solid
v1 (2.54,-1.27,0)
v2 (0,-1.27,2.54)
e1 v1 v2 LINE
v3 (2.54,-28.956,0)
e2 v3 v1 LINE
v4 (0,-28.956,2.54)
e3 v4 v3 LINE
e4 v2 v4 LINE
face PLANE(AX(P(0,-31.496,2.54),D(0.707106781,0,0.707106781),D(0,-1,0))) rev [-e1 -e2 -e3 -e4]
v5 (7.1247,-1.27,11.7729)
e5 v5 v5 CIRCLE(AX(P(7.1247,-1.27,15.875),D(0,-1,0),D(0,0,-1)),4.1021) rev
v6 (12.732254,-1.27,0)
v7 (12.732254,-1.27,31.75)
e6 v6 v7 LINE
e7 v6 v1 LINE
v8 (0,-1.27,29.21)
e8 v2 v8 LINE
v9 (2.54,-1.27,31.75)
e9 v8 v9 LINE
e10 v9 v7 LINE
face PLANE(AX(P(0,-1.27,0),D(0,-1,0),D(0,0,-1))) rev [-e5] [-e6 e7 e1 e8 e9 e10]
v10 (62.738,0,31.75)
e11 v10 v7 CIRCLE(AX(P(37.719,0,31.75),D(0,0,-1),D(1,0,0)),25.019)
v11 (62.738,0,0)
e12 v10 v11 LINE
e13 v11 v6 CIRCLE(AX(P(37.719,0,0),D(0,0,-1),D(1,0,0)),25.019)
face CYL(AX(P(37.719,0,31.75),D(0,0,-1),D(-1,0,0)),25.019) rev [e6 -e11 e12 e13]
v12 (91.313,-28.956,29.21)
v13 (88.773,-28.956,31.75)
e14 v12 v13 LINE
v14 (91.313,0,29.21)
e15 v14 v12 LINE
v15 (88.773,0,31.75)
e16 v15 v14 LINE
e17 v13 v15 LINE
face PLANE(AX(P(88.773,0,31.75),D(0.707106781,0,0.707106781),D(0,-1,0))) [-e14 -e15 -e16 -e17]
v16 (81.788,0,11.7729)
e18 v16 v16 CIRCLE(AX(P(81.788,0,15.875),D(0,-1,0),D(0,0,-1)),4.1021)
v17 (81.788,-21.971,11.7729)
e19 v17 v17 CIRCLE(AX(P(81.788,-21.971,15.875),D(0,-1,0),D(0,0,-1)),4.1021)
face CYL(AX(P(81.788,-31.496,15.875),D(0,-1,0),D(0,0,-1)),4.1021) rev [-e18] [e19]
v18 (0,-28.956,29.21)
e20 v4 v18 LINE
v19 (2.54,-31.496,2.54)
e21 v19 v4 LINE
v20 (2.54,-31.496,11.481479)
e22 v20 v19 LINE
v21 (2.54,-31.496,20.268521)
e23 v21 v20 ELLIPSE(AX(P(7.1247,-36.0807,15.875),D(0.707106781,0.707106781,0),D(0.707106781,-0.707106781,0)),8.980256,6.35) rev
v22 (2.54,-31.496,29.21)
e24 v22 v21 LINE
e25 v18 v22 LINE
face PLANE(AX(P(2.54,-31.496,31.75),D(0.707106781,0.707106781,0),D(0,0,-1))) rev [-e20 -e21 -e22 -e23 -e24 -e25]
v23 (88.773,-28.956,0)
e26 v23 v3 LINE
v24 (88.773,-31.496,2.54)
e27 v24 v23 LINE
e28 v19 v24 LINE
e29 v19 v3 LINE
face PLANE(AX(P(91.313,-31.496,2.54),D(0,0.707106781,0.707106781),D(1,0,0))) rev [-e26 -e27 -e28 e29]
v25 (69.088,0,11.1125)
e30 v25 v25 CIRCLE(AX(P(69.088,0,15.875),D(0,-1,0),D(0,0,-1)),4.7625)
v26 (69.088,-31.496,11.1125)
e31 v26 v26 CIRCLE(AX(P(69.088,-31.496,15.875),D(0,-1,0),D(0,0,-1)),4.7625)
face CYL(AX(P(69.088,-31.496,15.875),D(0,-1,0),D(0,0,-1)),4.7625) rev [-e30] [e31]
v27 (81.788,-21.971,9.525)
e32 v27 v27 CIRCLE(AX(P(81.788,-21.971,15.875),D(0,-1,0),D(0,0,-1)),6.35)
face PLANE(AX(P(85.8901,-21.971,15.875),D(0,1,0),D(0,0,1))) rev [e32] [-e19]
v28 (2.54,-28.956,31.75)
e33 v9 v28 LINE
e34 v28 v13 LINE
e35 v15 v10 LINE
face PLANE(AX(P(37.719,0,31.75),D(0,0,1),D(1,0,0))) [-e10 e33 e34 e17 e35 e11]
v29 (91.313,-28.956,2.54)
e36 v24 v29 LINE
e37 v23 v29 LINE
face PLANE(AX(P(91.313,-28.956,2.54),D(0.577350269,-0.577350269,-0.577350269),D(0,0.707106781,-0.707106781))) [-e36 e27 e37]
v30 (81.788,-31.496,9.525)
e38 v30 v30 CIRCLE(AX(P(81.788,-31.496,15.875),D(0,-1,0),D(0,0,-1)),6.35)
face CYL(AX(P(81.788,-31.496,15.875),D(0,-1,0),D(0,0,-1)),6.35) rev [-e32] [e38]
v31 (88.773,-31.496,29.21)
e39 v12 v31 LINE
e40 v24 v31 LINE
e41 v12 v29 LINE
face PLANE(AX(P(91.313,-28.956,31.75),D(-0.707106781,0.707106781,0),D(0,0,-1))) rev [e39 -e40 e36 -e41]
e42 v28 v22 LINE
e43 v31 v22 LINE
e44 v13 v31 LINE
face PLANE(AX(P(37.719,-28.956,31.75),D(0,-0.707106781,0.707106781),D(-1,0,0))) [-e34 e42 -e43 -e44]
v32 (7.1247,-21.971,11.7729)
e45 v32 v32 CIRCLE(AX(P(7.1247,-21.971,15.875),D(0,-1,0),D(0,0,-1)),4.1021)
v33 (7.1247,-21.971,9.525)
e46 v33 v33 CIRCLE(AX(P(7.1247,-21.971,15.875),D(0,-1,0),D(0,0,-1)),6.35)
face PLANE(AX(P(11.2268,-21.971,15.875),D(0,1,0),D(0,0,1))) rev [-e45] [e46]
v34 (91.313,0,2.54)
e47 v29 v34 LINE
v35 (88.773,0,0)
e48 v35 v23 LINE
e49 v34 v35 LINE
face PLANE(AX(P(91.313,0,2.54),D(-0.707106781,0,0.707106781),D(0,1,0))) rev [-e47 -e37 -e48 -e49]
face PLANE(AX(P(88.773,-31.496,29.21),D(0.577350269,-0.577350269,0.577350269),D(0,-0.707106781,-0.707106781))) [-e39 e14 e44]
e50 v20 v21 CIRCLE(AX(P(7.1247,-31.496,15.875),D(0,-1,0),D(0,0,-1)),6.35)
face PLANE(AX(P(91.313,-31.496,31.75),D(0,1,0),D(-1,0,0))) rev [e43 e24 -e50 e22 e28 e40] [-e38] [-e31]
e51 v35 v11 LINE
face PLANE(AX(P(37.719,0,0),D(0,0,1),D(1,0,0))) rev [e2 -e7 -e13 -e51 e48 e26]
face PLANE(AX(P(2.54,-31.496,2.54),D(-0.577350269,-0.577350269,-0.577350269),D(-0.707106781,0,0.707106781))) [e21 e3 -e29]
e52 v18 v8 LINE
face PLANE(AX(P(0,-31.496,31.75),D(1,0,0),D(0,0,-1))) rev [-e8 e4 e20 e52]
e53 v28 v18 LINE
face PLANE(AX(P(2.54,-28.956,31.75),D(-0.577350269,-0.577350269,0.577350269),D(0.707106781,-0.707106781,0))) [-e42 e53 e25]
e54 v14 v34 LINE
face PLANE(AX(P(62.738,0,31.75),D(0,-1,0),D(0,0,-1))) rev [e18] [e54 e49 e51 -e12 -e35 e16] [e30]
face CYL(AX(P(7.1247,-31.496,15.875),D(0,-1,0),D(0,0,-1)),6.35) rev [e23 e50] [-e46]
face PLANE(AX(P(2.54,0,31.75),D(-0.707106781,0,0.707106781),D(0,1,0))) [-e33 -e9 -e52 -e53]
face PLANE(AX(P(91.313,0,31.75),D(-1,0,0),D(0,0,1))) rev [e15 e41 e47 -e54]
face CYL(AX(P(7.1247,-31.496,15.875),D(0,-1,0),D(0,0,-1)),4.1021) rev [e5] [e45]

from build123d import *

# Parameters (mm, degrees)
BOSS_EXTRUDE1_DEPTH                               = 31.75
CBORE_FOR_5_16_SOCKET_HEAD_CAP_SCREW1_D           = 8.2042
CBORE_FOR_5_16_SOCKET_HEAD_CAP_SCREW1_CBORE_D     = 12.7
CBORE_FOR_5_16_SOCKET_HEAD_CAP_SCREW1_CBORE_DEPTH = 9.525
F_3_8_0_375_CLEARANCE_DOWEL_HOLE2_D               = 9.525
SKETCH9_W                                         = 23.721553131
SKETCH9_H                                         = 31.75
CUT_EXTRUDE1_DEPTH                                = 1.27


with BuildPart() as part:
    # Sketch1 → Boss-Extrude1 (new body)
    with BuildSketch(Plane.XY):
        with BuildLine():
            Line((0, 0), (12.7, 0))
            ThreePointArc((12.7, 0), (37.719, -25.019), (62.738, 0))
            Line((62.738, 0), (91.313, 0))
            Line((91.313, 0), (91.313, -31.496))
            Line((91.313, -31.496), (0, -31.496))
            Line((0, -31.496), (0, 0))
        make_face()
    extrude(amount=BOSS_EXTRUDE1_DEPTH)

    # CBORE for 5/16 Socket Head Cap Screw1 (through all)
    with Locations(Plane(origin=(0, -31.496, 0), x_dir=(-1, 0, 0), z_dir=(0, -1, 0))):
        with Locations((-7.1247, -15.875), (-81.788, -15.875)):
            CounterBoreHole(CBORE_FOR_5_16_SOCKET_HEAD_CAP_SCREW1_D / 2, CBORE_FOR_5_16_SOCKET_HEAD_CAP_SCREW1_CBORE_D / 2, CBORE_FOR_5_16_SOCKET_HEAD_CAP_SCREW1_CBORE_DEPTH)

    # 3/8 (0.375) Clearance Dowel Hole2 (through all)
    with Locations(Plane(origin=(0, -31.496, 0), x_dir=(-1, 0, 0), z_dir=(0, -1, 0))):
        with Locations((-69.088, -15.875)):
            Hole(F_3_8_0_375_CLEARANCE_DOWEL_HOLE2_D / 2)

    # Sketch9 → Cut-Extrude1 (cut)
    with BuildSketch(Plane(origin=(0, 0, 0), x_dir=(1, 0, 0), z_dir=(0, 1, 0))):
        with Locations((11.860776566, -15.875)):
            Rectangle(SKETCH9_W, SKETCH9_H)
    extrude(amount=-CUT_EXTRUDE1_DEPTH, mode=Mode.SUBTRACT)

    # Chamfer1
    # the kernel refuses this chamfer: 2.54 mm, written as the material it takes off along each edge
    with BuildSketch(Plane(origin=(89.619666667, -29.802666667, 30.056666667), x_dir=(0, -0.7071067811865476, -0.7071067811865476), z_dir=(0.5773502691896247, -0.5773502691896263, 0.5773502691896263)), Plane(origin=(1.693333333, -29.802666667, 1.693333333), x_dir=(0.7071067811865474, 0, -0.7071067811865477), z_dir=(-0.5773502691896264, -0.5773502691896247, -0.5773502691896262))) as chamfer1_piece_1:
        Polygon((-1.796051224, -1.036950658), (1.796051224, -1.036950658), (0, 2.073901316), align=None)
    extrude(amount=3.226233304, mode=Mode.SUBTRACT)
    with BuildSketch(Plane(origin=(89.619666667, -29.802666667, 1.693333333), x_dir=(0, -0.7071067811865474, 0.7071067811865477), z_dir=(0.5773502691896246, -0.5773502691896264, -0.5773502691896262)), Plane(origin=(1.693333333, -29.802666667, 30.056666667), x_dir=(0.7071067811865476, 0, 0.7071067811865476), z_dir=(-0.5773502691896263, -0.5773502691896247, 0.5773502691896263))) as chamfer1_piece_2:
        Polygon((-1.796051224, 1.036950658), (1.796051224, 1.036950658), (0, -2.073901316), align=None)
    extrude(amount=3.226233304, mode=Mode.SUBTRACT)
    with BuildSketch(Plane(origin=(91.313, 6.532074789, 31.75), x_dir=(-0.9996219169112968, 0, 0.02749587661058591), z_dir=(0, -1, 0))) as chamfer1_piece_3:
        with BuildLine():
            Line((2.612829916, 0), (-0.143629773, 2.608879196))
            Line((-0.143629773, 2.608879196), (-0.194410567, 2.607482405))
            ThreePointArc((-0.194410567, 2.607482405), (-0.086688237, 1.304030487), (-0.050780793, -0.001396791))
            Line((-0.050780793, -0.001396791), (0.001396791, -0.050780793))
            ThreePointArc((0.001396791, -0.050780793), (1.306824068, -0.01487335), (2.614226706, -0.050780793))
            Line((2.614226706, -0.050780793), (2.612829916, 0))
        make_face()
    extrude(amount=44.560149579, mode=Mode.SUBTRACT)
    with BuildSketch(Plane(origin=(91.313, -31.496, -6.532074789), x_dir=(-0.9996219169112968, -0.02749587661058591, 0), z_dir=(0, 0, 1)), Plane(origin=(0, -31.496, -6.532074789), x_dir=(-0.027495876610586358, 0.9996219169112968, 0), z_dir=(0, 0, 1))) as chamfer1_piece_4:
        with BuildLine():
            Line((2.612829916, 0), (-0.143629773, -2.608879196))
            Line((-0.143629773, -2.608879196), (-0.194410567, -2.607482405))
            ThreePointArc((-0.194410567, -2.607482405), (-0.086688237, -1.304030487), (-0.050780793, 0.001396791))
            Line((-0.050780793, 0.001396791), (0.001396791, 0.050780793))
            ThreePointArc((0.001396791, 0.050780793), (1.306824068, 0.01487335), (2.614226706, 0.050780793))
            Line((2.614226706, 0.050780793), (2.612829916, 0))
        make_face()
    extrude(amount=44.814149579, mode=Mode.SUBTRACT)
    with BuildSketch(Plane(origin=(0, -38.028074789, 0), x_dir=(-0.027495876610586365, 0, 0.9996219169112968), z_dir=(0, 1, 0))) as chamfer1_piece_5:
        with BuildLine():
            Line((2.612829916, 0), (-0.143629773, 2.608879196))
            Line((-0.143629773, 2.608879196), (-0.194410567, 2.607482405))
            ThreePointArc((-0.194410567, 2.607482405), (-0.086688237, 1.304030487), (-0.050780793, -0.001396791))
            Line((-0.050780793, -0.001396791), (0.001396791, -0.050780793))
            ThreePointArc((0.001396791, -0.050780793), (1.306824068, -0.01487335), (2.614226706, -0.050780793))
            Line((2.614226706, -0.050780793), (2.612829916, 0))
        make_face()
    extrude(amount=43.290149579, mode=Mode.SUBTRACT)
    with BuildSketch(Plane(origin=(0, -38.028074789, 31.75), x_dir=(-0.0274958766105864, 0, -0.9996219169112968), z_dir=(0, 1, 0))) as chamfer1_piece_6:
        with BuildLine():
            Line((2.612829916, 0), (-0.143629773, -2.608879196))
            Line((-0.143629773, -2.608879196), (-0.194410567, -2.607482405))
            ThreePointArc((-0.194410567, -2.607482405), (-0.086688237, -1.304030487), (-0.050780793, 0.001396791))
            Line((-0.050780793, 0.001396791), (0.001396791, 0.050780793))
            ThreePointArc((0.001396791, 0.050780793), (1.306824068, 0.01487335), (2.614226706, 0.050780793))
            Line((2.614226706, 0.050780793), (2.612829916, 0))
        make_face()
    extrude(amount=43.290149579, mode=Mode.SUBTRACT)
    with BuildSketch(Plane(origin=(97.845074789, -31.496, 31.75), x_dir=(0, 0.9996219169112966, 0.027495876610585942), z_dir=(-1, 0, 0))) as chamfer1_piece_7:
        with BuildLine():
            Line((2.612829916, 0), (-0.143629773, 2.608879196))
            Line((-0.143629773, 2.608879196), (-0.194410567, 2.607482405))
            ThreePointArc((-0.194410567, 2.607482405), (-0.086688237, 1.304030487), (-0.050780793, -0.001396791))
            Line((-0.050780793, -0.001396791), (0.001396791, -0.050780793))
            ThreePointArc((0.001396791, -0.050780793), (1.306824068, -0.01487335), (2.614226706, -0.050780793))
            Line((2.614226706, -0.050780793), (2.612829916, 0))
        make_face()
    extrude(amount=104.377149579, mode=Mode.SUBTRACT)
    with BuildSketch(Plane(origin=(91.313, 6.532074789, 0), x_dir=(-0.9996219169112968, 0, -0.027495876610586324), z_dir=(0, -1, 0))) as chamfer1_piece_8:
        with BuildLine():
            Line((2.612829916, 0), (-0.143629773, -2.608879196))
            Line((-0.143629773, -2.608879196), (-0.194410567, -2.607482405))
            ThreePointArc((-0.194410567, -2.607482405), (-0.086688237, -1.304030487), (-0.050780793, 0.001396791))
            Line((-0.050780793, 0.001396791), (0.001396791, 0.050780793))
            ThreePointArc((0.001396791, 0.050780793), (1.306824068, 0.01487335), (2.614226706, 0.050780793))
            Line((2.614226706, 0.050780793), (2.612829916, 0))
        make_face()
    extrude(amount=44.560149579, mode=Mode.SUBTRACT)
    with BuildSketch(Plane(origin=(97.845074789, -31.496, 0), x_dir=(0, 0.9996219169112966, -0.0274958766105864), z_dir=(-1, 0, 0))) as chamfer1_piece_9:
        with BuildLine():
            Line((2.612829916, 0), (-0.143629773, -2.608879196))
            Line((-0.143629773, -2.608879196), (-0.194410567, -2.607482405))
            ThreePointArc((-0.194410567, -2.607482405), (-0.086688237, -1.304030487), (-0.050780793, 0.001396791))
            Line((-0.050780793, 0.001396791), (0.001396791, 0.050780793))
            ThreePointArc((0.001396791, 0.050780793), (1.306824068, 0.01487335), (2.614226706, 0.050780793))
            Line((2.614226706, 0.050780793), (2.612829916, 0))
        make_face()
    extrude(amount=104.377149579, mode=Mode.SUBTRACT)


solid = part.part
